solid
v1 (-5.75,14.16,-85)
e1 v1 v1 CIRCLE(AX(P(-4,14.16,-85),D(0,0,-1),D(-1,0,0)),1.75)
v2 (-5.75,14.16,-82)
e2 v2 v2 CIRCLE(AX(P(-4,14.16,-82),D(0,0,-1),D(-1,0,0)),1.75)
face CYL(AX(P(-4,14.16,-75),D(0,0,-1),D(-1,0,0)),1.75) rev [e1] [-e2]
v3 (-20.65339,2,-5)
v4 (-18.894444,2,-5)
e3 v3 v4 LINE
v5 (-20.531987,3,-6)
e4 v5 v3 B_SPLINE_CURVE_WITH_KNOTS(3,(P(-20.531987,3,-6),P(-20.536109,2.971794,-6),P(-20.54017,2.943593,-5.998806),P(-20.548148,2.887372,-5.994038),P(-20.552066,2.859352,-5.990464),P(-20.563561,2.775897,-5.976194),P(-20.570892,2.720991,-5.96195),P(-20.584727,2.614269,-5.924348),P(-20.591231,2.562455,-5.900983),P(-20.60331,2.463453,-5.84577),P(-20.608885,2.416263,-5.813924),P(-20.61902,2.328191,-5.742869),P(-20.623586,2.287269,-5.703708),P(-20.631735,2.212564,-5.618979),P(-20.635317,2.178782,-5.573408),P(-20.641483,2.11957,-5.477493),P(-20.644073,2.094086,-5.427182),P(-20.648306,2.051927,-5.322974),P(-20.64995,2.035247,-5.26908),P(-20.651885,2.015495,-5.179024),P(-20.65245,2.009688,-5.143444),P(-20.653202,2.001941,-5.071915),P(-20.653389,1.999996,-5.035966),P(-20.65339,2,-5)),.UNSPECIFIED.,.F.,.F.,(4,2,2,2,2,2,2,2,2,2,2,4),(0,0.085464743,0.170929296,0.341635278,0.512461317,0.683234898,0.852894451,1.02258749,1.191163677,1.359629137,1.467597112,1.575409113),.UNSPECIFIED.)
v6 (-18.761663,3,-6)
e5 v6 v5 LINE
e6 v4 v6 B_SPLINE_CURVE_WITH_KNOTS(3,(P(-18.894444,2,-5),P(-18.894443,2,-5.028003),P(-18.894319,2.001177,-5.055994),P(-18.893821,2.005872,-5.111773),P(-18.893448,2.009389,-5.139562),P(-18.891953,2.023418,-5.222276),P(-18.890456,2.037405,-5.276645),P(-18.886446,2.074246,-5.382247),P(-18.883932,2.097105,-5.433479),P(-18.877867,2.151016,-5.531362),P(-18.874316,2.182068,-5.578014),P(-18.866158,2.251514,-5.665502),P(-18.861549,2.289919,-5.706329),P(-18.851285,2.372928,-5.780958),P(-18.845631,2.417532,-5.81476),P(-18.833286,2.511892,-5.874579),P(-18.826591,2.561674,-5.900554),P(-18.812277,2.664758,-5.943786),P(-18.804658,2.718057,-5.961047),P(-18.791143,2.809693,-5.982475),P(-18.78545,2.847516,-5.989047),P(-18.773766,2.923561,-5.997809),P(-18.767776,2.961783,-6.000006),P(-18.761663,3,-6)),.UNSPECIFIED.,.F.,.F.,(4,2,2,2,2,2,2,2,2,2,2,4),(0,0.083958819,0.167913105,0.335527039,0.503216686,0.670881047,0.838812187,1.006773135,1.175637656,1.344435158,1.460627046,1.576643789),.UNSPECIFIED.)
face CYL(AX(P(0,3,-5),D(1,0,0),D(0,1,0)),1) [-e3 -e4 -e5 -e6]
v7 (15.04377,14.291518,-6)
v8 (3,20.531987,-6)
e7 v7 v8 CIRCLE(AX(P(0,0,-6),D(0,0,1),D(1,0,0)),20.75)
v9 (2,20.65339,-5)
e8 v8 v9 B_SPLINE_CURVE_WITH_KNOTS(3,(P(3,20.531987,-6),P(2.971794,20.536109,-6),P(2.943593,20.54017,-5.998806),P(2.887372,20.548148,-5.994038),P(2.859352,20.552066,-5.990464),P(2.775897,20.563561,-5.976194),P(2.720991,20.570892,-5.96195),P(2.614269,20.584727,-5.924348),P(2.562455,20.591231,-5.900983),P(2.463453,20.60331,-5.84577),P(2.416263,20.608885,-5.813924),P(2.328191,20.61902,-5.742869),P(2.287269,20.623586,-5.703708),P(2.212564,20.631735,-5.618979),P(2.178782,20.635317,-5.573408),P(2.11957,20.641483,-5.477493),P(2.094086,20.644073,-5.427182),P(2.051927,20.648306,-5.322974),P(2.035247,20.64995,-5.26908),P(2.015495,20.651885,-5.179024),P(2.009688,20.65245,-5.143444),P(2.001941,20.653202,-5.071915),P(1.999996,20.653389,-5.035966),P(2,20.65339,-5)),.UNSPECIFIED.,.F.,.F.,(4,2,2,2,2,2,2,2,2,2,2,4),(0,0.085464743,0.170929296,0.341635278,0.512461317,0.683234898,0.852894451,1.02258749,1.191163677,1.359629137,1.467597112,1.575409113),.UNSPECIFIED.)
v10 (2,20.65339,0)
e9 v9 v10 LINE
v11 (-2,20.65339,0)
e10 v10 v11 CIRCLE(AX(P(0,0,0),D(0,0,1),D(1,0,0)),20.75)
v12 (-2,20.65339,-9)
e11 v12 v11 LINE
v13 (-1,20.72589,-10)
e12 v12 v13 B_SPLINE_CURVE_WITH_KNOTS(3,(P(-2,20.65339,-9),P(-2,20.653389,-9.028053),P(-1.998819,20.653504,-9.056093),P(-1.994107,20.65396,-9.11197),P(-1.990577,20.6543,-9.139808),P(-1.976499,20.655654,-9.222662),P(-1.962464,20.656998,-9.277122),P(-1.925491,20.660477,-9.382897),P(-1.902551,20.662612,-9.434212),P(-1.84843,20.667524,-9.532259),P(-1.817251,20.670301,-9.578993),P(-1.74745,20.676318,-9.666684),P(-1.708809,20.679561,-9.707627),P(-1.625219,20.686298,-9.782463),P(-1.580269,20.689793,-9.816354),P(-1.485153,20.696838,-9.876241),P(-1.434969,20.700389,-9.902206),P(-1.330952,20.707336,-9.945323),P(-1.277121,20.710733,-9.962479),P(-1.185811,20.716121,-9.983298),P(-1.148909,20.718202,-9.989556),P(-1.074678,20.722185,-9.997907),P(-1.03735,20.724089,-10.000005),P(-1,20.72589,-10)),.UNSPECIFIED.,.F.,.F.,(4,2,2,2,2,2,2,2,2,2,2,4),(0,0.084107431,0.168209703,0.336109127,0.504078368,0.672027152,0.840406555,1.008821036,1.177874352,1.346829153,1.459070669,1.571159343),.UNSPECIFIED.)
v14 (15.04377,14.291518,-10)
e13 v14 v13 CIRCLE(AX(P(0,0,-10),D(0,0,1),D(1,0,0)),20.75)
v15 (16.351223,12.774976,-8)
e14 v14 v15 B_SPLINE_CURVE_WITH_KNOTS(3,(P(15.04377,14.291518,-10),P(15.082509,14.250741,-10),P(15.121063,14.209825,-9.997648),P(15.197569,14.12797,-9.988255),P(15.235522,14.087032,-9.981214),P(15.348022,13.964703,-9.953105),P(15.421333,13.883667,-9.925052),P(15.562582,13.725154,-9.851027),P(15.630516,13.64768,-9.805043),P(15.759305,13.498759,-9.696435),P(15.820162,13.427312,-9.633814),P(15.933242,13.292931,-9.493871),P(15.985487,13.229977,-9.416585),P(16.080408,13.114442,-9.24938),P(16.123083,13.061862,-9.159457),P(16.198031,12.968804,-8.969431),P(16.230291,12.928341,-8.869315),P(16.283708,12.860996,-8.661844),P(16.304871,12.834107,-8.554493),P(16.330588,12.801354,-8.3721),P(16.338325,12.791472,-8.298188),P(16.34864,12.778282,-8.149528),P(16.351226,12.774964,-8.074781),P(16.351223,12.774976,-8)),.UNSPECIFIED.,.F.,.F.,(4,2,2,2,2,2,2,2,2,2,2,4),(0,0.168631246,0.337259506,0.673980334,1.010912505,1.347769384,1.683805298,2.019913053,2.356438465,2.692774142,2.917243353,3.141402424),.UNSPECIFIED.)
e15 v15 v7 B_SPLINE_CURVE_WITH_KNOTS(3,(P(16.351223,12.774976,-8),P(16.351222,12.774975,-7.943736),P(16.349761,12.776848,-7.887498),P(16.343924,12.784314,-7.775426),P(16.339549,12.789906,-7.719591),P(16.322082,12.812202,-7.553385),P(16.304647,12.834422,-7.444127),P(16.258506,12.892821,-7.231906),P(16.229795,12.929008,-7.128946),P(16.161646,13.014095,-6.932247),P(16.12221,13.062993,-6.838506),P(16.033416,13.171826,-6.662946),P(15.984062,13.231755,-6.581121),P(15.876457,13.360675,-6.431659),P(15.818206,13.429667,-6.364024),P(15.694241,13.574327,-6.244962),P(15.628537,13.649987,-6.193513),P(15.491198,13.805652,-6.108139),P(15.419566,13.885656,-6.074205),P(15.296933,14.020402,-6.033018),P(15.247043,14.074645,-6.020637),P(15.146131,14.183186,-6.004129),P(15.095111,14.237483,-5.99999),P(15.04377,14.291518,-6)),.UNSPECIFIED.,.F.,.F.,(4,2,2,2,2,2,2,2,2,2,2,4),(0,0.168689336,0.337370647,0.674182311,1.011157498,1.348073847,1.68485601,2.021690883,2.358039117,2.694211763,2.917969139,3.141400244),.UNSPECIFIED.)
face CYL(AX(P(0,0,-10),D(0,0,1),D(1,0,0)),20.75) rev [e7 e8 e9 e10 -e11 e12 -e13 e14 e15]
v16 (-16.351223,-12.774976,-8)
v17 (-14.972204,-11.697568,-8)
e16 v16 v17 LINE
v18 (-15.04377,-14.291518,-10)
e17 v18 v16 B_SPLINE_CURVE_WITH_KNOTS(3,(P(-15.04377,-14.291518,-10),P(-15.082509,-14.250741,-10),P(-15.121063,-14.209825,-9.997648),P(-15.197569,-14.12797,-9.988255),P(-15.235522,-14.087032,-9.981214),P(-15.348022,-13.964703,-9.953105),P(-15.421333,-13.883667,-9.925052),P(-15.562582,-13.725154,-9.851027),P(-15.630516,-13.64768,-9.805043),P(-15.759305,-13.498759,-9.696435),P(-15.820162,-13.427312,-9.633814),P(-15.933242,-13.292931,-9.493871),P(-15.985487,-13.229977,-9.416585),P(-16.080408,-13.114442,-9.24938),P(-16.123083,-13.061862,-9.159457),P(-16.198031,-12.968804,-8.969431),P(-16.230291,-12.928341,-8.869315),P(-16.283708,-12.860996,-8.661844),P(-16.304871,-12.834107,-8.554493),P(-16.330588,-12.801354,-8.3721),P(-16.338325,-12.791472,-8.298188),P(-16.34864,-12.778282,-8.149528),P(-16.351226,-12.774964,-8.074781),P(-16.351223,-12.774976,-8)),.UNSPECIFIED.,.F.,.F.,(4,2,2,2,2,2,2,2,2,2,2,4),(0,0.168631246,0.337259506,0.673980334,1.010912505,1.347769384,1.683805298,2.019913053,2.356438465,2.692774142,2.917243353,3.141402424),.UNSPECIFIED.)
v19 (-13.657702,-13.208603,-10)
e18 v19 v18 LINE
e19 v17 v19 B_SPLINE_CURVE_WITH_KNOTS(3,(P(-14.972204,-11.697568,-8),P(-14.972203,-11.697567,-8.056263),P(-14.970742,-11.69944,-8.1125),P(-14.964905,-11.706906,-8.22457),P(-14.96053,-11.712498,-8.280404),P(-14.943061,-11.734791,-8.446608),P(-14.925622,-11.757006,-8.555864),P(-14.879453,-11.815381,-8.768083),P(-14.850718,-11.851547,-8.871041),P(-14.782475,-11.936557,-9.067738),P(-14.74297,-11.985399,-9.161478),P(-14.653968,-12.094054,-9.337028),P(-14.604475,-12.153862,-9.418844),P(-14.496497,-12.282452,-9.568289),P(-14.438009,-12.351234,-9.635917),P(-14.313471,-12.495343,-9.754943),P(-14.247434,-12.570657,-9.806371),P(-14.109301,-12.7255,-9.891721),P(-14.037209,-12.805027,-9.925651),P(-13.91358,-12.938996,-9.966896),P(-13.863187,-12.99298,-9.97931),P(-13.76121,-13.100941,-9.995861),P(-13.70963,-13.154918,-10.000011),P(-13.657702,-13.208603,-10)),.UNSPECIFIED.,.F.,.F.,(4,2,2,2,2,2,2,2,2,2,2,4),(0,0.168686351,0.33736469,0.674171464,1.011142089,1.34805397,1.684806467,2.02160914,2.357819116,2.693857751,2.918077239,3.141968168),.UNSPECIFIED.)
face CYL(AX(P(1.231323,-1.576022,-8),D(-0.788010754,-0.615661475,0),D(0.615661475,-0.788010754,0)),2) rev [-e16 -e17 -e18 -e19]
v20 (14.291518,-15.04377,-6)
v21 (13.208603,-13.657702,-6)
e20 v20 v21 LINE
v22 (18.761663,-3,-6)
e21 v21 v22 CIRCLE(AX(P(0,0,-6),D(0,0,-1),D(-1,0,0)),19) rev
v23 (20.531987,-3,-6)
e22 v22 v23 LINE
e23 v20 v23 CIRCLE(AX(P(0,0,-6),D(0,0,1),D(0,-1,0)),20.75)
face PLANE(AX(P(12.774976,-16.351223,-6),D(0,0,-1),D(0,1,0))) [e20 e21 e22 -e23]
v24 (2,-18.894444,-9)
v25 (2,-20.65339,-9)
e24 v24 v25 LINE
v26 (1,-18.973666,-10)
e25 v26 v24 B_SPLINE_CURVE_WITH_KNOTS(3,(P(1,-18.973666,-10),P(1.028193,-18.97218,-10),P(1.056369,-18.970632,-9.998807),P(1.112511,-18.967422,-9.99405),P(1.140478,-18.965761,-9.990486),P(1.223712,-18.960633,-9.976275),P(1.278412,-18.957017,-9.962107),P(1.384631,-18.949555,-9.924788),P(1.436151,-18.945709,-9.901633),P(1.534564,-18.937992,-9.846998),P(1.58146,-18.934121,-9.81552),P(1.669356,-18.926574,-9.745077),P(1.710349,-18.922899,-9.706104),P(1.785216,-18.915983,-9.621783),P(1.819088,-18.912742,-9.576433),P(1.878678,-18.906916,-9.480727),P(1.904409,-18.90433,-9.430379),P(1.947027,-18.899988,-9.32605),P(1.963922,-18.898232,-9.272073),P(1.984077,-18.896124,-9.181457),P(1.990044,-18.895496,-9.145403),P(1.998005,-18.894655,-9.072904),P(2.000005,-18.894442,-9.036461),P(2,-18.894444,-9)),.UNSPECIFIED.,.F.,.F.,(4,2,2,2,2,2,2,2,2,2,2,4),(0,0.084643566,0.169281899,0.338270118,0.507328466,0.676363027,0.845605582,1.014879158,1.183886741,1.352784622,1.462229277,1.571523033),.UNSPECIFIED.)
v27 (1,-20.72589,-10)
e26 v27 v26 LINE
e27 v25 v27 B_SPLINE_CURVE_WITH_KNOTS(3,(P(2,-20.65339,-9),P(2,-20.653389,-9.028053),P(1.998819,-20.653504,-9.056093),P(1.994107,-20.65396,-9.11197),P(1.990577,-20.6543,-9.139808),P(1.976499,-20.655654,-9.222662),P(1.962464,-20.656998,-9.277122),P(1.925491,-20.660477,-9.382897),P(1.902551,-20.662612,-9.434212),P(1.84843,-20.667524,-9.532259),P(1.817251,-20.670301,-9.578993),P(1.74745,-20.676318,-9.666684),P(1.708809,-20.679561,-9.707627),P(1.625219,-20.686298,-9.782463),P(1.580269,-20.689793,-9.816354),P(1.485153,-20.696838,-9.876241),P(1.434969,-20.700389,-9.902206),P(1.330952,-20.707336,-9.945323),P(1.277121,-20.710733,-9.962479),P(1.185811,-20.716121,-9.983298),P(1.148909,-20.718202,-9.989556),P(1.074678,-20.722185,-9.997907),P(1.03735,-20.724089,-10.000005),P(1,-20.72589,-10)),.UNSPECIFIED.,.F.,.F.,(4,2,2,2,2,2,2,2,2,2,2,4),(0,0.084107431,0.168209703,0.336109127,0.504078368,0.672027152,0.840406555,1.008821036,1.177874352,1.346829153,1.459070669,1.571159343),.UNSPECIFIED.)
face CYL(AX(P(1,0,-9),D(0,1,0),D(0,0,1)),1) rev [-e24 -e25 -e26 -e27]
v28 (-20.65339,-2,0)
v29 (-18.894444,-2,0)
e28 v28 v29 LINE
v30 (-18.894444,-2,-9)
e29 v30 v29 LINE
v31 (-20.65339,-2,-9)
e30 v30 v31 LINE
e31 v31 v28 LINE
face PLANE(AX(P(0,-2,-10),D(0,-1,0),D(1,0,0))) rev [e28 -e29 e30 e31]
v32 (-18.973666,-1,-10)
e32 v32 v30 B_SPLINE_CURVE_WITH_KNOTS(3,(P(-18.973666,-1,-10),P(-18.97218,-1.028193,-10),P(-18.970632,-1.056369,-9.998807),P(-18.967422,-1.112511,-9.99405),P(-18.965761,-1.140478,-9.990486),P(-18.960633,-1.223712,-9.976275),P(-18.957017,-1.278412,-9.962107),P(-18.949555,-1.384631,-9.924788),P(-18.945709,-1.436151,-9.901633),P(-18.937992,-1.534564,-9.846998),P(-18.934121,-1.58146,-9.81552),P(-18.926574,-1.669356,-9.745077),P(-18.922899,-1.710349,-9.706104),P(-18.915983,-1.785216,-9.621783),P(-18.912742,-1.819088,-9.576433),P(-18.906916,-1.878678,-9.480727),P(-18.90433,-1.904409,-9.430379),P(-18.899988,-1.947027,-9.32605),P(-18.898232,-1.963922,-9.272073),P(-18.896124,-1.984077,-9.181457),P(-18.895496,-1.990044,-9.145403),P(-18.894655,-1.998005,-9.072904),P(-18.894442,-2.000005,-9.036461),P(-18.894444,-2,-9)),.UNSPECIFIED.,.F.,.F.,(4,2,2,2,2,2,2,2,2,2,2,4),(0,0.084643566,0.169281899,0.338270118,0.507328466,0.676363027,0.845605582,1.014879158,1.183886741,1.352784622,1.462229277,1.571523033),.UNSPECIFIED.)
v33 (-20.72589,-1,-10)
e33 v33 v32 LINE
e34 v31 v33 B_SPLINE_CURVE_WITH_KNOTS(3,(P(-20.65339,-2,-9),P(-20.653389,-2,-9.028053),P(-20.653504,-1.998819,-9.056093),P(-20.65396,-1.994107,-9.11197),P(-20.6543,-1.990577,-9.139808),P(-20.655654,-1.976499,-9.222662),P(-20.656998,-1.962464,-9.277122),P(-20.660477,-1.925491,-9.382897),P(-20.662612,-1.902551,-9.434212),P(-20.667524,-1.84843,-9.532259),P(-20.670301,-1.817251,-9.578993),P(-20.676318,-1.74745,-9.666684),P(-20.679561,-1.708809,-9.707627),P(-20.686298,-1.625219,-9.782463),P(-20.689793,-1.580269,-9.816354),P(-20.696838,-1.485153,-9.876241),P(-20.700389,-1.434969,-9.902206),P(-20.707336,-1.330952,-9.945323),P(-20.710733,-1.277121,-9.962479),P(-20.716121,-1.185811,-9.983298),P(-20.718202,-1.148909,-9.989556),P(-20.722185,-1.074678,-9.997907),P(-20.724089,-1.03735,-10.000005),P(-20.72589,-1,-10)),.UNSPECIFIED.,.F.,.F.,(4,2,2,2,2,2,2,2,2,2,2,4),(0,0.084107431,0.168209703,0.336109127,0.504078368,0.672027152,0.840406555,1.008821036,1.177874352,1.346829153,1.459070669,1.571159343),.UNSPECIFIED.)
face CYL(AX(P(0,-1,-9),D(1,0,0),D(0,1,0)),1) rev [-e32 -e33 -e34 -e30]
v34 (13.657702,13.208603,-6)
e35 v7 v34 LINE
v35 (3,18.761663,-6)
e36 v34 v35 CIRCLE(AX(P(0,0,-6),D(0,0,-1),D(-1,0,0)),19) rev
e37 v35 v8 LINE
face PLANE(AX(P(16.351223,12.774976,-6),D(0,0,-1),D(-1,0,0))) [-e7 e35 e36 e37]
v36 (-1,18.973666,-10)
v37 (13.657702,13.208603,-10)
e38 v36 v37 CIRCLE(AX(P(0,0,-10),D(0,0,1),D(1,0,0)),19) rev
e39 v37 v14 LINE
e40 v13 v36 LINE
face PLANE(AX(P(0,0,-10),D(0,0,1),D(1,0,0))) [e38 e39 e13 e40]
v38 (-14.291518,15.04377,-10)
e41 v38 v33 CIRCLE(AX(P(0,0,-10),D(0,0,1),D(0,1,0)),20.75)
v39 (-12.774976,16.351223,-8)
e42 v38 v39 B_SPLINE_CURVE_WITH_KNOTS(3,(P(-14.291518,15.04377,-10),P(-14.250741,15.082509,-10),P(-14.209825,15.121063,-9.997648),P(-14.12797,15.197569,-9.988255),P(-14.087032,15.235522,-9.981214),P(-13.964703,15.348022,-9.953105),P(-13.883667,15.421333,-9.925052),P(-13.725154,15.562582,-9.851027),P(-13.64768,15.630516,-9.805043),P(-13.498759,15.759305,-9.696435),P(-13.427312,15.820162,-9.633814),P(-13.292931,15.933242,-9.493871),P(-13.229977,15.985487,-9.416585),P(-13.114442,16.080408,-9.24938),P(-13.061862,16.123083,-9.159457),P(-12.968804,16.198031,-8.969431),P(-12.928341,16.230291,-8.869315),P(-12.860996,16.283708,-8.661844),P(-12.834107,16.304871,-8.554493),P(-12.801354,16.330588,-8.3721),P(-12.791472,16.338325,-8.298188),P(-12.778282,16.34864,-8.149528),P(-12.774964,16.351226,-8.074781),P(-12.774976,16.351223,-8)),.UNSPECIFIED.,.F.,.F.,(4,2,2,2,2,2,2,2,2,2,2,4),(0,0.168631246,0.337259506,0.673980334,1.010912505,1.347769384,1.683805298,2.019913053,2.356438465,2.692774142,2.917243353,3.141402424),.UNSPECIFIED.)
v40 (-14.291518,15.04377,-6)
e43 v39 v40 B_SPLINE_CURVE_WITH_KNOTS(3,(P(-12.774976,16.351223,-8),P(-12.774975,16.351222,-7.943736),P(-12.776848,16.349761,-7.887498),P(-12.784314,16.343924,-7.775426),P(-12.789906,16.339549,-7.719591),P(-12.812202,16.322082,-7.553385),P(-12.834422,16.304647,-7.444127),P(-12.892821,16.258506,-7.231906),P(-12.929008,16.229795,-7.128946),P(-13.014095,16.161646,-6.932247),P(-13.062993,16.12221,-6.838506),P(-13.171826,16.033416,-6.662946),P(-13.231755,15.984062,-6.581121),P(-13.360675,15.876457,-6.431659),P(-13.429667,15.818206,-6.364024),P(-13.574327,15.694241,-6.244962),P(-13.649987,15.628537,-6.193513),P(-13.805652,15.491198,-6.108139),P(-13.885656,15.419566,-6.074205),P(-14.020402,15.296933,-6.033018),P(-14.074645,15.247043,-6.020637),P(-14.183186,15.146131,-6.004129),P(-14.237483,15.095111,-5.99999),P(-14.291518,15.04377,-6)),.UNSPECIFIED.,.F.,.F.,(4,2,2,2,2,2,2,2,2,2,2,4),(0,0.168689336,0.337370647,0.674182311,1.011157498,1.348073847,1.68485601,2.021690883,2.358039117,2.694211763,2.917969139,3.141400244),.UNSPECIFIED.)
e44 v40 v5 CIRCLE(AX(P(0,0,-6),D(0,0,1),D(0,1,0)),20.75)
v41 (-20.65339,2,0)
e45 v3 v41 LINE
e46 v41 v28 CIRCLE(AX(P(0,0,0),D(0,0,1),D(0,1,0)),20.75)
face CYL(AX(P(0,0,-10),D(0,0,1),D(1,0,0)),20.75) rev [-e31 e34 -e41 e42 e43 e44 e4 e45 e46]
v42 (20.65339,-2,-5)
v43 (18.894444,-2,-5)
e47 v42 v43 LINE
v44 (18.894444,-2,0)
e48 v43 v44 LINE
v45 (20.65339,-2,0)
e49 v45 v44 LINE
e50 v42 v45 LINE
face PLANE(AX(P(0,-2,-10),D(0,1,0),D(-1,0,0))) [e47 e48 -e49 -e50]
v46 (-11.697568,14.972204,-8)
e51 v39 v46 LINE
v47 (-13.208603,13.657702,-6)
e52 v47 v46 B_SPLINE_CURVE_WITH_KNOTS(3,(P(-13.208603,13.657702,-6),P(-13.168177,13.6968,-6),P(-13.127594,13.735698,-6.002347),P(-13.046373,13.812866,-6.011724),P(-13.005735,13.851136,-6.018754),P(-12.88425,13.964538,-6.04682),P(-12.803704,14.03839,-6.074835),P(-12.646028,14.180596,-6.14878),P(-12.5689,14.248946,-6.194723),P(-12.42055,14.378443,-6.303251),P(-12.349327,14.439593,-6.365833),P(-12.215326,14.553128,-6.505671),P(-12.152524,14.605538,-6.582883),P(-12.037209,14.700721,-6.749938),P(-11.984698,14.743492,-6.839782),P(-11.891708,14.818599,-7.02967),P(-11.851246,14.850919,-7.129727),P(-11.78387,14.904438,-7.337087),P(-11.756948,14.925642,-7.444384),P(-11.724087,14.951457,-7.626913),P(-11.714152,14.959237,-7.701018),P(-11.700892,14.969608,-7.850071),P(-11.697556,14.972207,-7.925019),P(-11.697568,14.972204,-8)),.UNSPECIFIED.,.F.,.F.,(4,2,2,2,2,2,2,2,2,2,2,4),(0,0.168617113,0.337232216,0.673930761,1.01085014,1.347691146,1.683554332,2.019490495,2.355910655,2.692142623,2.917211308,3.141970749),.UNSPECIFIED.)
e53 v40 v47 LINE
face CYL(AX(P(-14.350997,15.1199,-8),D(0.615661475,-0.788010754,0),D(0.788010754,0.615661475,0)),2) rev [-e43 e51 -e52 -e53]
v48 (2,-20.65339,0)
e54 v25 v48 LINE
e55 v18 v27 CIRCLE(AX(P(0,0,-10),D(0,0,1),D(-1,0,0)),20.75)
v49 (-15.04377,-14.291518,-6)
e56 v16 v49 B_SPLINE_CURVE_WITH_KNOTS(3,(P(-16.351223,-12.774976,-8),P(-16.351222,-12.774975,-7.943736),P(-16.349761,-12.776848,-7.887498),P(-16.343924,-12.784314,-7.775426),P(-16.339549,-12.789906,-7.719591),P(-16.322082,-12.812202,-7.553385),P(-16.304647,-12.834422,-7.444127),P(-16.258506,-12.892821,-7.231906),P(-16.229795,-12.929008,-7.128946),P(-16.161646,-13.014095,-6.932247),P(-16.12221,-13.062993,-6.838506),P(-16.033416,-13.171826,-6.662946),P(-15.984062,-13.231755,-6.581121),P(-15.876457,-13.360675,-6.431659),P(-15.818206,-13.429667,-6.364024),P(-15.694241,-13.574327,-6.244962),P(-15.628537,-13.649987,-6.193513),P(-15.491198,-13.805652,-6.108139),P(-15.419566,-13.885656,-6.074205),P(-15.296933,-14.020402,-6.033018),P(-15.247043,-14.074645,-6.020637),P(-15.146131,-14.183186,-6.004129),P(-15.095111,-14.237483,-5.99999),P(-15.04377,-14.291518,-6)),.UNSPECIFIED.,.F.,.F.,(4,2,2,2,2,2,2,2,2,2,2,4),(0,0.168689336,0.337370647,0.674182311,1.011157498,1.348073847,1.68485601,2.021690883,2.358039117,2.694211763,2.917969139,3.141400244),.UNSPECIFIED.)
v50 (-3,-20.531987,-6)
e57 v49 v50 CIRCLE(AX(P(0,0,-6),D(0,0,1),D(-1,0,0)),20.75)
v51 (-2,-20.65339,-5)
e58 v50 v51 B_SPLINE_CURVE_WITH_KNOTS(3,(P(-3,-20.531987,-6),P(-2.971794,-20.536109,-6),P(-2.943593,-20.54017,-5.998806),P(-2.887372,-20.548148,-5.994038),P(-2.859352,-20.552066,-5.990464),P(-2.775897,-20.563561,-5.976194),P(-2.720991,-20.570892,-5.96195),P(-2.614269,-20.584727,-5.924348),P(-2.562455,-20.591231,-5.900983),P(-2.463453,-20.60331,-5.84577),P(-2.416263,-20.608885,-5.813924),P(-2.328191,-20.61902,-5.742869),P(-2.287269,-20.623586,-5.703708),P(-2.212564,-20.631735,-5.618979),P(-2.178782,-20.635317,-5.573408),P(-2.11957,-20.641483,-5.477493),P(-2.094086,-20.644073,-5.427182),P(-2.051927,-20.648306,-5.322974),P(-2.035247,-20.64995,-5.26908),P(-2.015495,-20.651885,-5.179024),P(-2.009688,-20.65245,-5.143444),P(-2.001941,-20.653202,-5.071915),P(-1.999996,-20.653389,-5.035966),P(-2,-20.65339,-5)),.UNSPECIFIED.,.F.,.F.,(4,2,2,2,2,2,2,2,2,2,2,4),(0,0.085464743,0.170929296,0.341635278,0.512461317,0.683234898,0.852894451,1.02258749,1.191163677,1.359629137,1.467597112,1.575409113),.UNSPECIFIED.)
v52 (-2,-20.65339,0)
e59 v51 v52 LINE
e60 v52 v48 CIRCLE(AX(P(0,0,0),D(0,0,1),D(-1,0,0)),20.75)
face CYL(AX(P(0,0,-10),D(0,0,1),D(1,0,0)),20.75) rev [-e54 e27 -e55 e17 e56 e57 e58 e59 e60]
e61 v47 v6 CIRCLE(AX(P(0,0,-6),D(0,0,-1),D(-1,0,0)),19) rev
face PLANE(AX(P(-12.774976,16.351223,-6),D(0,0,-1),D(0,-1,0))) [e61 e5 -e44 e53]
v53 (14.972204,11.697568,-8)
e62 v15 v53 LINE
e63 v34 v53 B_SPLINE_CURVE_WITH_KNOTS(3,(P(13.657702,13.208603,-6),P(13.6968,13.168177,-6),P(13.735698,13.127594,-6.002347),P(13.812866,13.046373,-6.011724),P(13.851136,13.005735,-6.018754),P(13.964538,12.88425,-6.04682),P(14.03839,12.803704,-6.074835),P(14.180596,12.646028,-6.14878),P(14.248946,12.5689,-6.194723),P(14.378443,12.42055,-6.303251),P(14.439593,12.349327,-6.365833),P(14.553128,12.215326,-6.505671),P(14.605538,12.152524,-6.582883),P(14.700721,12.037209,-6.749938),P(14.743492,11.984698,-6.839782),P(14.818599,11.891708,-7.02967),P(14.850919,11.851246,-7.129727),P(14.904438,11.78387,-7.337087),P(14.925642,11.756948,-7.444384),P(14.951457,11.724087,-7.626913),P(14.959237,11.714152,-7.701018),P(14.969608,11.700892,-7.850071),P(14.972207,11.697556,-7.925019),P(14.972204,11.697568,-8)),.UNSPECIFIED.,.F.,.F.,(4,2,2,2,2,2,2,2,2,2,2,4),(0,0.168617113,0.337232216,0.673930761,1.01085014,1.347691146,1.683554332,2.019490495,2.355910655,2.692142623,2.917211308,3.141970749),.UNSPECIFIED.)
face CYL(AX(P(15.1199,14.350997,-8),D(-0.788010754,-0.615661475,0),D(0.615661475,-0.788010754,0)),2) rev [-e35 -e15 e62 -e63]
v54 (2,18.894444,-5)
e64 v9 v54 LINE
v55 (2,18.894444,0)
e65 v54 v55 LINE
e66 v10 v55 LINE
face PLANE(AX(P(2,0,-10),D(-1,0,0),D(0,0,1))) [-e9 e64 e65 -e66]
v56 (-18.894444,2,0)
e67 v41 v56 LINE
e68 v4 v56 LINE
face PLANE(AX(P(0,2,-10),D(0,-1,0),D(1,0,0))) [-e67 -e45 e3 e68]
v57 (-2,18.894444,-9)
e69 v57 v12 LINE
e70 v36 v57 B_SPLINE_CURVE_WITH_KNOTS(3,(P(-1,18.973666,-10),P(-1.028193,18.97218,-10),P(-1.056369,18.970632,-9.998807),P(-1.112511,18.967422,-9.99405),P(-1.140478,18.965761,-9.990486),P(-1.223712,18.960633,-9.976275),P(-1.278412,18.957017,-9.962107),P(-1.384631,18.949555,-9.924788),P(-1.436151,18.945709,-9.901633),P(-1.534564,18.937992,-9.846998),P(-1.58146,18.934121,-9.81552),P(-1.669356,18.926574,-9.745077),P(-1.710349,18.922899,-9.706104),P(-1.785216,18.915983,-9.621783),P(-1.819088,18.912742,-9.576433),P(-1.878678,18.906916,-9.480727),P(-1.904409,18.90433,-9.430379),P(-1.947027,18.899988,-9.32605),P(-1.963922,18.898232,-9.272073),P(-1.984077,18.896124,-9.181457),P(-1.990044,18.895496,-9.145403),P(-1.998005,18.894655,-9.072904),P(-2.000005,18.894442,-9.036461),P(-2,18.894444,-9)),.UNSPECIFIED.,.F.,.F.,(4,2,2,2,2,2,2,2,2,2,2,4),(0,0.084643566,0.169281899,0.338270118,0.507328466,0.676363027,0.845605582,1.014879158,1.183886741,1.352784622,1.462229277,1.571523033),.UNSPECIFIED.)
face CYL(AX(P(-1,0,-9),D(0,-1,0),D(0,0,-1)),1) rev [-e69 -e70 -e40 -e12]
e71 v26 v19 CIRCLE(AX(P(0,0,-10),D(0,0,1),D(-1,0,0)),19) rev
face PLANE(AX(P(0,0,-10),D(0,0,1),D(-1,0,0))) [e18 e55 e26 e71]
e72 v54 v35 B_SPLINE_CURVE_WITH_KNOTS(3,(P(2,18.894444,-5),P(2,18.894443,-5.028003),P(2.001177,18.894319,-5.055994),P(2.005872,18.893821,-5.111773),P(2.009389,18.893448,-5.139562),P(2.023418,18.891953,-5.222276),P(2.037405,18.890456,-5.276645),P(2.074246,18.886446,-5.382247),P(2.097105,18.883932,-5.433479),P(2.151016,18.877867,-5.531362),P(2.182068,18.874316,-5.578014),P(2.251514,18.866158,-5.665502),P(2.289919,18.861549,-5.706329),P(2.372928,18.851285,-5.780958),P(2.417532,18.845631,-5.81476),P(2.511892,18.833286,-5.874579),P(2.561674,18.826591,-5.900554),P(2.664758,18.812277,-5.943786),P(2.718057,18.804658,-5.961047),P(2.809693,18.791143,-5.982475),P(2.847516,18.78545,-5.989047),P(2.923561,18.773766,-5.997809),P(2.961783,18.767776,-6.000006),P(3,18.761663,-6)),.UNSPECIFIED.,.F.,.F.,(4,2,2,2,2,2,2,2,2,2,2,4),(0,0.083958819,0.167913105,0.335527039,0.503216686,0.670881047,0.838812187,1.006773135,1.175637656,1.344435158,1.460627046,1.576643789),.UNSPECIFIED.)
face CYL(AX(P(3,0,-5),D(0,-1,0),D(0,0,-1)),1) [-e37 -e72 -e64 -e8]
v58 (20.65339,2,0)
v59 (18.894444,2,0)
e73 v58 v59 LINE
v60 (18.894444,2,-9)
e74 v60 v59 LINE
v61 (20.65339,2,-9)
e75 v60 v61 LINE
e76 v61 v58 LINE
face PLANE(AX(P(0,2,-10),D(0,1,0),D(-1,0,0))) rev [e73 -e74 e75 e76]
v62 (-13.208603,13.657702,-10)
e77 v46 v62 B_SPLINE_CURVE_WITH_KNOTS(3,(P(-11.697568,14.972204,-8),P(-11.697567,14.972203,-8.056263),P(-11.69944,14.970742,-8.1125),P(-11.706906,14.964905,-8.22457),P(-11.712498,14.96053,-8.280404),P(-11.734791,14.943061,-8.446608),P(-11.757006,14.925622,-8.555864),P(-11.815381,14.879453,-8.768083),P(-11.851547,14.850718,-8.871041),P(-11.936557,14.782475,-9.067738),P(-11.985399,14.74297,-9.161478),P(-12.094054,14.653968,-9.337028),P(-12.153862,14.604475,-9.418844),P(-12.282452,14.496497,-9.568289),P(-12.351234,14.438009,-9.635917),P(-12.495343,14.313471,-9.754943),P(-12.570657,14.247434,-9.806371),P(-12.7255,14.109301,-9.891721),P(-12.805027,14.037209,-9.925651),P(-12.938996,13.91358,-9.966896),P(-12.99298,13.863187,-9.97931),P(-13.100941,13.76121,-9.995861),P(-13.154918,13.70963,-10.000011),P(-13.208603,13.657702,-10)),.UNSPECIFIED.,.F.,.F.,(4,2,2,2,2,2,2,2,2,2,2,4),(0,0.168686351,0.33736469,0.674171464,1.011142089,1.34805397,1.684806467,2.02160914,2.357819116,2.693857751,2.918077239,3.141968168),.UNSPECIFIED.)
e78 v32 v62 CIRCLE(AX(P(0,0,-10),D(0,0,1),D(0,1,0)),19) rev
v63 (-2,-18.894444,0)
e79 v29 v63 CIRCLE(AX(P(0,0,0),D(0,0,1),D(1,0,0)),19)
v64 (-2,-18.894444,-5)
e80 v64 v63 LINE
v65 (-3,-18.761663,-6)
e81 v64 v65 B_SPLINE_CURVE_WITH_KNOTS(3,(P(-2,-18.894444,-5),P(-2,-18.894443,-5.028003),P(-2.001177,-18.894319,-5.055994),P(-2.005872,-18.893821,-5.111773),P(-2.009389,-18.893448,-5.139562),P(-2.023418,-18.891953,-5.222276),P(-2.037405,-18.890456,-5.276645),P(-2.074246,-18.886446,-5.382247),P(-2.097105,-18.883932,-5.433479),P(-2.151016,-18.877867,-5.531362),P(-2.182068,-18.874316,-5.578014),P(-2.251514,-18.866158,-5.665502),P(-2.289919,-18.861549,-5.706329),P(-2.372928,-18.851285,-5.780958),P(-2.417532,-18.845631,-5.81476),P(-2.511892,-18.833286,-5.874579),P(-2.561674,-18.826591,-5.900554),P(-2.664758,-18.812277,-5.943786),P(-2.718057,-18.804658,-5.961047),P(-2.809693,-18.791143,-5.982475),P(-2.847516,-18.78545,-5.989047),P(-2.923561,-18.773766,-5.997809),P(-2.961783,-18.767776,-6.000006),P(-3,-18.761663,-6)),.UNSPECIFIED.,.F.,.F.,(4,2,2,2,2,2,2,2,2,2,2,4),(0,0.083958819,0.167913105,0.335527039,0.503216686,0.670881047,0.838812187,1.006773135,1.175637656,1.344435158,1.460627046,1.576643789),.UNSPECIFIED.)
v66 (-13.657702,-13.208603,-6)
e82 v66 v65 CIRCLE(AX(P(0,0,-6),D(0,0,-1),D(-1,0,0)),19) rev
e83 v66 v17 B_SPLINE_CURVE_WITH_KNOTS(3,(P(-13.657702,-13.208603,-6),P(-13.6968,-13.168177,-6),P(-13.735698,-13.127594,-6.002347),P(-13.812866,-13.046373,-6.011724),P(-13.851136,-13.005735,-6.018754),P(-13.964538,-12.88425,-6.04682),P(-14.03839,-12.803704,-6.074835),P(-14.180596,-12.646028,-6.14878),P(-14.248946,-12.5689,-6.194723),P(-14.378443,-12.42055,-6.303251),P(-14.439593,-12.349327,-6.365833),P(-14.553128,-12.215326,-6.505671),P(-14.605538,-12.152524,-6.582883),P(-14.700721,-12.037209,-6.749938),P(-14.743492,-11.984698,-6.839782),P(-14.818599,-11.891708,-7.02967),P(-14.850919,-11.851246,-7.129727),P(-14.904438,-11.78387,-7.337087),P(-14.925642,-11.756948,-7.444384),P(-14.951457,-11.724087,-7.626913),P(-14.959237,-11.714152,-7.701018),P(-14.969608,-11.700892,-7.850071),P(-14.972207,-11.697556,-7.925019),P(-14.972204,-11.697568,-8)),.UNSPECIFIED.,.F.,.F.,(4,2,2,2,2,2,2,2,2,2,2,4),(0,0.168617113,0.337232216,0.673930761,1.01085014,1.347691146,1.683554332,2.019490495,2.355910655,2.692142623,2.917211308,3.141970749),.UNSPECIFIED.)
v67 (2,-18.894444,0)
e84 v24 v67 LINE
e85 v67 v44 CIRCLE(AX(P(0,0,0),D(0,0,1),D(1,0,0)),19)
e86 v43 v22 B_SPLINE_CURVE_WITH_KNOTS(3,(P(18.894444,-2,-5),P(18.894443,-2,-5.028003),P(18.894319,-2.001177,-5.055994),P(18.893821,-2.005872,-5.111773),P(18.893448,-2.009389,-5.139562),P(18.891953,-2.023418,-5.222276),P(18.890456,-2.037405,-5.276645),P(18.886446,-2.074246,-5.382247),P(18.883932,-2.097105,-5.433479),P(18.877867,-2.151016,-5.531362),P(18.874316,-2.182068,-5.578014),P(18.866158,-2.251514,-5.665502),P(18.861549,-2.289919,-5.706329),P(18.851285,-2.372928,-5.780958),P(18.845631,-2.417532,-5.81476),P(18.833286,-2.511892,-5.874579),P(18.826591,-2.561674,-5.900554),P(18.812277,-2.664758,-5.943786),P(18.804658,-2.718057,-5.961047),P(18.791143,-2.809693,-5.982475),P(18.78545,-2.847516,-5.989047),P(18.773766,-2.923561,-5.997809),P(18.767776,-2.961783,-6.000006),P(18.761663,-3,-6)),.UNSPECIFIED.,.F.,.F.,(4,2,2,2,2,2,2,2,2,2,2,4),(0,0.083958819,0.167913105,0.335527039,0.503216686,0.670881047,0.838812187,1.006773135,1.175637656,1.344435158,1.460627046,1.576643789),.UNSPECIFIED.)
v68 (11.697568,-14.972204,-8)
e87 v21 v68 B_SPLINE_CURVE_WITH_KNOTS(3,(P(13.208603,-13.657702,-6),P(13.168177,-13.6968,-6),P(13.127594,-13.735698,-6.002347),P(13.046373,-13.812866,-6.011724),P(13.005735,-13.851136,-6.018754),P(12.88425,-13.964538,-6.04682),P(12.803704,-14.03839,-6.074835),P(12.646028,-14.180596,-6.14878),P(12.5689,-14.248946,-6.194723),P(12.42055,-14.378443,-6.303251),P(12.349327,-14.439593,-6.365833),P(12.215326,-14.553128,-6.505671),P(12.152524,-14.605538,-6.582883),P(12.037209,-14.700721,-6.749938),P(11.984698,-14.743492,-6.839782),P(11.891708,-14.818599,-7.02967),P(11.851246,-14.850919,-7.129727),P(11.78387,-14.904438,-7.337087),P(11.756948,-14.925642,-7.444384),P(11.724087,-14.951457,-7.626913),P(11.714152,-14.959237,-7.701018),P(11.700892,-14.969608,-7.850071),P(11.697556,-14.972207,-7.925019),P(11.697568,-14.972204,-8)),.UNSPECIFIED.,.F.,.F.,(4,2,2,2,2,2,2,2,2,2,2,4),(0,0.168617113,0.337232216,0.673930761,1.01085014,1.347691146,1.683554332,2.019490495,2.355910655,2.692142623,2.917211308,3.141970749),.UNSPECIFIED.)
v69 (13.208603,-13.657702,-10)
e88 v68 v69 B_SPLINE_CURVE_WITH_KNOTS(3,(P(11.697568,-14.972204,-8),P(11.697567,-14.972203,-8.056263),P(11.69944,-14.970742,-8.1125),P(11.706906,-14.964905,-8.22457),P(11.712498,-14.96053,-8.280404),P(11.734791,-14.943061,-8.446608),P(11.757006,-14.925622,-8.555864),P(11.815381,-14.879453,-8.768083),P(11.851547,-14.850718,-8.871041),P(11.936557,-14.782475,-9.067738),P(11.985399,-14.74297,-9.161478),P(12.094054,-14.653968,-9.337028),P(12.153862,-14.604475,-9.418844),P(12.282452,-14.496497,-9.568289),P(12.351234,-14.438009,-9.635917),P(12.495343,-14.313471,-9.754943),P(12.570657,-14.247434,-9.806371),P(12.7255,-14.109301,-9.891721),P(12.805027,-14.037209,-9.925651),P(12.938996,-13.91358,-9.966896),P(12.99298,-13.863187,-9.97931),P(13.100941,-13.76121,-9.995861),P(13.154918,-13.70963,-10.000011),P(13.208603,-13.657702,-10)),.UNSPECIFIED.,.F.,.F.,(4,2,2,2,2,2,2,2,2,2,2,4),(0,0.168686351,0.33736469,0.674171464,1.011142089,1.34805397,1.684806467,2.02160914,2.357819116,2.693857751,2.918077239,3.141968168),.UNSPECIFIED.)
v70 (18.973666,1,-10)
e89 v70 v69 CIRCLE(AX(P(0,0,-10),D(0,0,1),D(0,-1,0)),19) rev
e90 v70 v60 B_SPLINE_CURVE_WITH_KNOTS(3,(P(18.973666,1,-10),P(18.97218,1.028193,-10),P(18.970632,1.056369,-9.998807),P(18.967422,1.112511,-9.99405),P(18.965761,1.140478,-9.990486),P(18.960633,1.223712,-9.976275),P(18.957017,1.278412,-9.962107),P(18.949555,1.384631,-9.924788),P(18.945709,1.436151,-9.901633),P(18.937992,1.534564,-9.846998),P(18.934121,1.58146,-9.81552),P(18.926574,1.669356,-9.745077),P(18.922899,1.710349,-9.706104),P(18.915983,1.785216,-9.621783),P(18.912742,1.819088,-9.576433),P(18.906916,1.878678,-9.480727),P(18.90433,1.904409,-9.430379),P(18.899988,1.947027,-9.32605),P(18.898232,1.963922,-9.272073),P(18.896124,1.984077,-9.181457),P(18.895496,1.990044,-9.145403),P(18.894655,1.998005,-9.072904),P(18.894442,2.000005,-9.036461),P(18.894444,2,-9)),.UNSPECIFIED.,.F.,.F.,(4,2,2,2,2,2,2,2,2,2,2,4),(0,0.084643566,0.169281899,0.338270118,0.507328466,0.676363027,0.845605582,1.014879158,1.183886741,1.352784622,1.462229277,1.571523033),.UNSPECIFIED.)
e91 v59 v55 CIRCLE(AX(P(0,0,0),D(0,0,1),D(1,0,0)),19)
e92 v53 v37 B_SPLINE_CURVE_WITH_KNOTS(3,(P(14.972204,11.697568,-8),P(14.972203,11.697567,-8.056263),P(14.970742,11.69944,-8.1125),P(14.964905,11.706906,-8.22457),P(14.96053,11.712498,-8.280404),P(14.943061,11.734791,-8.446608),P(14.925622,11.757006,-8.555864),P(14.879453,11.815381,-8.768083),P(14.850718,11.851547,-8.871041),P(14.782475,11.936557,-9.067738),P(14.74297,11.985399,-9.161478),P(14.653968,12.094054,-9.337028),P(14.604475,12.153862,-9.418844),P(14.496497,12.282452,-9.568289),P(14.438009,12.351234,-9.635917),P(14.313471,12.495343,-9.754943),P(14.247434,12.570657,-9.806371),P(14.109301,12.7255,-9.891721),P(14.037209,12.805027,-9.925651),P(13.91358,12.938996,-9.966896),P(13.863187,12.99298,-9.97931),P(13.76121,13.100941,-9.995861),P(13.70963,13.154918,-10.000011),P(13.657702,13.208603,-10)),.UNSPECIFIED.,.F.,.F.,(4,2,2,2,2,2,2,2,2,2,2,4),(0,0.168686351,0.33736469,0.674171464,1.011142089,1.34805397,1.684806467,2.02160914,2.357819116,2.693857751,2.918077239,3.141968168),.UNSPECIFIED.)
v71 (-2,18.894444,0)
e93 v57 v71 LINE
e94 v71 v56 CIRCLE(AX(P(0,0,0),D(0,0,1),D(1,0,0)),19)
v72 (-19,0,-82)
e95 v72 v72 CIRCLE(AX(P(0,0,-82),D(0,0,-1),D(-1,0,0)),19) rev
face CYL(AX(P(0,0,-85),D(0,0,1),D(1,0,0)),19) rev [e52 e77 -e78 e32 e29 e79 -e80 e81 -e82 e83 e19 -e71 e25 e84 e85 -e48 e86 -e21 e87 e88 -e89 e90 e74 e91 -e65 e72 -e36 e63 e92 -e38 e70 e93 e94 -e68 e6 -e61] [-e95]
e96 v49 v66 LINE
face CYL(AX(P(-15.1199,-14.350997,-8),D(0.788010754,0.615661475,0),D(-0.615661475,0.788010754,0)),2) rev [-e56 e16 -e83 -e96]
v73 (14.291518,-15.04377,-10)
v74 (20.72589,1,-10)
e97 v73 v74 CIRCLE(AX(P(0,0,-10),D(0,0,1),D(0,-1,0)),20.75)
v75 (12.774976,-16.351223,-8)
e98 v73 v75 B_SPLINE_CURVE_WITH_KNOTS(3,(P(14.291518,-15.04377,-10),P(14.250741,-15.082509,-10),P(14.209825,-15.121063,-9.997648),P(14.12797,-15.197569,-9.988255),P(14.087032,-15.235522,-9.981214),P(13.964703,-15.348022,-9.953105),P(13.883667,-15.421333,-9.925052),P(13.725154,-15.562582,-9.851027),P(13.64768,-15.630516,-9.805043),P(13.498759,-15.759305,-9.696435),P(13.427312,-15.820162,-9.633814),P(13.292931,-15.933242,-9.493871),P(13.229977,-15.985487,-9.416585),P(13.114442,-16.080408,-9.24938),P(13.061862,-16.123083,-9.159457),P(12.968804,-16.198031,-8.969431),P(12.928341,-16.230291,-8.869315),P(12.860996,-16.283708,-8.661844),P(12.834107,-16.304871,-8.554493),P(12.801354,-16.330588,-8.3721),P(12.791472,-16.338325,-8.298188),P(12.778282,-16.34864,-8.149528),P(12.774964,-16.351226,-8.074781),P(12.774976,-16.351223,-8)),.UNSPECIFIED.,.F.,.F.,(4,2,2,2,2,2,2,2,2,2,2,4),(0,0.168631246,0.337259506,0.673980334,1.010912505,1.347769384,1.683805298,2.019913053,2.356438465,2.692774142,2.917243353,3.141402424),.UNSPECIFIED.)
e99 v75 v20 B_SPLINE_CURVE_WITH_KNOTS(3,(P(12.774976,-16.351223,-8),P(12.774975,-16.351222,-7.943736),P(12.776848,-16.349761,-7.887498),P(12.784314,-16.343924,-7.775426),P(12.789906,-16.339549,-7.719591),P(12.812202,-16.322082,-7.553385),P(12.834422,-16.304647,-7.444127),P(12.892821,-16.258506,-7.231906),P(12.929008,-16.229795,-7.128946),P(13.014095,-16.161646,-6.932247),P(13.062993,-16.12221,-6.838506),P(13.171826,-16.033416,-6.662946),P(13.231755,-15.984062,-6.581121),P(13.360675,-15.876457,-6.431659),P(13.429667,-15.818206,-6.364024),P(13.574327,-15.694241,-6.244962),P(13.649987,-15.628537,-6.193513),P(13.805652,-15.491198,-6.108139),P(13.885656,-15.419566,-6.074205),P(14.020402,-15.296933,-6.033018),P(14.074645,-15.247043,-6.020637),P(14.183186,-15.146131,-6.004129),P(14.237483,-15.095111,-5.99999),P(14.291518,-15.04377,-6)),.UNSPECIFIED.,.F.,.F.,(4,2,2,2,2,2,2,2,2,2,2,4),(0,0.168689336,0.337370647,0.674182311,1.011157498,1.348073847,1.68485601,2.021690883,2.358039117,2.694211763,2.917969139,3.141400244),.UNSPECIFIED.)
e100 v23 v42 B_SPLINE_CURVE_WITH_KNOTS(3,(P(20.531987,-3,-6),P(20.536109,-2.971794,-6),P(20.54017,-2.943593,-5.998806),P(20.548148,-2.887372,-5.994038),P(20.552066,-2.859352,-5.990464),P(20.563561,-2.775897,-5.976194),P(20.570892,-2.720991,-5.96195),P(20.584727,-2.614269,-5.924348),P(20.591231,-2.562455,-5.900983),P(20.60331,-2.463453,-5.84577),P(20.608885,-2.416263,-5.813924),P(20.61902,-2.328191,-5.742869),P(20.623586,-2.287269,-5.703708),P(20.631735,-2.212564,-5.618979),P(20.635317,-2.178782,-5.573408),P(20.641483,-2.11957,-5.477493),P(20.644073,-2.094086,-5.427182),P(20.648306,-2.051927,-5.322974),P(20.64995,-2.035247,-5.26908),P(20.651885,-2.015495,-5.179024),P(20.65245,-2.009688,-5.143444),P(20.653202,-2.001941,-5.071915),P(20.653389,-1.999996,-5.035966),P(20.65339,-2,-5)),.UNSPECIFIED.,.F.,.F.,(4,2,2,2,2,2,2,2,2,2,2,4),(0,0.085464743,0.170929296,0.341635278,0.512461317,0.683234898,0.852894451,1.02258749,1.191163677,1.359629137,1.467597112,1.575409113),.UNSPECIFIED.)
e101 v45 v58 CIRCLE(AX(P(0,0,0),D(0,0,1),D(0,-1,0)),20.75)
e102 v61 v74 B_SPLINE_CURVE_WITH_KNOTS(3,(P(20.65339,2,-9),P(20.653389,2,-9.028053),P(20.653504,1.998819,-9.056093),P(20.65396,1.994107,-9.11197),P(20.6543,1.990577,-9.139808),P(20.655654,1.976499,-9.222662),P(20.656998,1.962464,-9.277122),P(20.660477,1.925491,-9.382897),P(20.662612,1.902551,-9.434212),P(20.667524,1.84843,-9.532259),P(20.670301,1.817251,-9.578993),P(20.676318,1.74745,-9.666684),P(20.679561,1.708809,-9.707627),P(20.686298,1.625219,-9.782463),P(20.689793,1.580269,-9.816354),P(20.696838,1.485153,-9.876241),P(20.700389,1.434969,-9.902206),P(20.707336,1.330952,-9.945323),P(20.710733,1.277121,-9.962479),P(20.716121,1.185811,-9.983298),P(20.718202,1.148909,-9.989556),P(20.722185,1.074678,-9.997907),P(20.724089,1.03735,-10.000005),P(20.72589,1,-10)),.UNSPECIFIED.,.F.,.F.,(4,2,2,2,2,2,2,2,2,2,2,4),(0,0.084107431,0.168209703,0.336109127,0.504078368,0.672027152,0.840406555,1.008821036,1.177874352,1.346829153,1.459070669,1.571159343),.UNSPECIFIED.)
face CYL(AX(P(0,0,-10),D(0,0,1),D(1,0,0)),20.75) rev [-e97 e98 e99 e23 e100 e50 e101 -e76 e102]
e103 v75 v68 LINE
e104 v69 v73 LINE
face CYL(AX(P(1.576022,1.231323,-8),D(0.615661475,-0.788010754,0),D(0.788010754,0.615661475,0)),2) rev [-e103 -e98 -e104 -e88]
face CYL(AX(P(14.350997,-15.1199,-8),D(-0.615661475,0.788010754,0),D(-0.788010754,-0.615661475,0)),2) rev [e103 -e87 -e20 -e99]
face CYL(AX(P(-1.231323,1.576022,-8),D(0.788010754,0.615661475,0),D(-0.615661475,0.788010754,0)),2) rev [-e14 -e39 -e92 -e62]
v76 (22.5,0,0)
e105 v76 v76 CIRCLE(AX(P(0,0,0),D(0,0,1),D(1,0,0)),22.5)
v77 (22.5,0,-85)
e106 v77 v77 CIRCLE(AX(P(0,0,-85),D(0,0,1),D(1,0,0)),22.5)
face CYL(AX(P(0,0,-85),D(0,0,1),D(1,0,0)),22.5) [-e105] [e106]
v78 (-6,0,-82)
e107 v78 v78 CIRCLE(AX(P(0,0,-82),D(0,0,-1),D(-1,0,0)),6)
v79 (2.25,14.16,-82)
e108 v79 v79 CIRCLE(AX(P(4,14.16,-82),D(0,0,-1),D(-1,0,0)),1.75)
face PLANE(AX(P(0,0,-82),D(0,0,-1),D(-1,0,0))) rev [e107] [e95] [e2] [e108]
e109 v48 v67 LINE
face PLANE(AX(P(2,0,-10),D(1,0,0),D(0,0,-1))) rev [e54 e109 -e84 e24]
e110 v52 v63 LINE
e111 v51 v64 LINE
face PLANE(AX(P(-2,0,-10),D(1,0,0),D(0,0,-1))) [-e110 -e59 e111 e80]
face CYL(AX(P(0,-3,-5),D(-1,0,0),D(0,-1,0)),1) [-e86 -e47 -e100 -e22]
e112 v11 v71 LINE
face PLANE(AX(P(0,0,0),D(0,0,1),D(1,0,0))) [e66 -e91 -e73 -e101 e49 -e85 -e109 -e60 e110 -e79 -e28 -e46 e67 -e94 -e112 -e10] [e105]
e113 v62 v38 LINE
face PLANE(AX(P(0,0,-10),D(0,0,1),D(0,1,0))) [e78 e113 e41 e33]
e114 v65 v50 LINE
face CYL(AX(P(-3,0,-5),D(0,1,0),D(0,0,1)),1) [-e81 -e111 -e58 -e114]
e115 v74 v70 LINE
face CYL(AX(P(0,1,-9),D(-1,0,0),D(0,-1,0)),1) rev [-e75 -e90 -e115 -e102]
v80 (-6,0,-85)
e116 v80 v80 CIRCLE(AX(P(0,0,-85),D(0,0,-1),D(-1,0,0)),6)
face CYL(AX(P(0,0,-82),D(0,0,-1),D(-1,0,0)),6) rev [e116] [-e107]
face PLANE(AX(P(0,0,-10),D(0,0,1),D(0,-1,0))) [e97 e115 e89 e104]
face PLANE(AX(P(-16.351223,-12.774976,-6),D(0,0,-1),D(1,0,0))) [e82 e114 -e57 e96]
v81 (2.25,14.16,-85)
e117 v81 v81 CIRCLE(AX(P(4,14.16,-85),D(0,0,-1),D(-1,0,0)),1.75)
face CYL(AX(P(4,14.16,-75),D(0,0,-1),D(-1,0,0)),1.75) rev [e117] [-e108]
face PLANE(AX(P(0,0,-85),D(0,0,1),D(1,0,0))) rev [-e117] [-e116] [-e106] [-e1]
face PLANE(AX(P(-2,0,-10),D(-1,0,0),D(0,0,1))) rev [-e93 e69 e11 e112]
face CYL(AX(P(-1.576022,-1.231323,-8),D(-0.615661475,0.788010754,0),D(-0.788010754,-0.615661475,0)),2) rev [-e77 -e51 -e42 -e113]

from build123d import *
from OCP.BRepFilletAPI import BRepFilletAPI_MakeFillet

# Parameters (mm, degrees)
SKETCH1_R                  = 22.5
SKETCH1_R_2                = 19
BOSS_EXTRUDE2_DEPTH        = 85
BOSS_EXTRUDE5_START        = -3
SKETCH3_R                  = 19
SKETCH3_R_2                = 6
BOSS_EXTRUDE5_DEPTH        = 3
CUT_EXTRUDE1_DEPTH         = 10
CUT_REVOLVE2_ANGLE         = 52.00000000000012
FILLET2_R                  = 2
FILLET2_R_2                = 1
CIRPATTERN1_COUNT          = 4
FILLET2_OF_CIRPATTERN1_R   = 2
FILLET2_OF_CIRPATTERN1_R_2 = 1
SKETCH17_R                 = 1.7499999999999998
CUT_EXTRUDE2_DEPTH         = 10


with BuildPart() as part:
    # Sketch1 → Boss-Extrude2 (new body)
    with BuildSketch(Plane.XY):
        Circle(SKETCH1_R)
        Circle(SKETCH1_R_2, mode=Mode.SUBTRACT)
    extrude(amount=-BOSS_EXTRUDE2_DEPTH)

    # Sketch3 → Boss-Extrude5 (add)
    with BuildSketch(Plane(origin=(0, 0, -85), x_dir=(-1, 0, 0), z_dir=(0, 0, -1)).offset(BOSS_EXTRUDE5_START)):
        with Locations(Location((0, 0, 0), (0, 0, 180))):
            Circle(SKETCH3_R)
        Circle(SKETCH3_R_2, mode=Mode.SUBTRACT)
    extrude(amount=BOSS_EXTRUDE5_DEPTH)

    # Sketch4 → Cut-Extrude1 (cut)
    with BuildSketch(Plane.XY):
        with BuildLine():
            ThreePointArc((1.999999999999999, 20.653389552322885), (1.27e-15, 20.75), (-2.000000000000001, 20.65338955232288))
            Line((-2, 20.65338955232288), (-2, 18.894443627691185))
            ThreePointArc((-2.000000000000001, 18.894443627691185), (1.16e-15, 19), (1.999999999999999, 18.894443627691185))
            Line((2, 18.894443627691185), (2, 20.65338955232288))
        make_face()
    cut_extrude1 = extrude(amount=-CUT_EXTRUDE1_DEPTH, mode=Mode.SUBTRACT)

    # Sketch8 → Cut-Revolve2 (revolve, cut)
    with BuildSketch(Plane(origin=(0, 0, 0), x_dir=(0, 0, -1), z_dir=(1, 0, 0))):
        Polygon((6.000000000000001, 20.75), (10, 20.75), (10, 18.9), (6.000000000000002, 18.9), align=None)
    cut_revolve2 = revolve(axis=Axis((0, 0, 0), (0, 0, -1)), revolution_arc=CUT_REVOLVE2_ANGLE, mode=Mode.SUBTRACT)

    # Fillet2
    fillet2_edges_1 = [part.edges().sort_by_distance(p)[0] for p in [
        (15.661713727933623, 12.236271822097425, -6.000000000000001),
        (15.661713727933623, 12.236271822097425, -10),
    ]]
    fillet2_edges_2 = [part.edges().sort_by_distance(p)[0] for p in [
        (-2, 19.773916590007033, -10),
        (2, 19.773916590007033, -6.000000000000002),
    ]]
    fillet2 = BRepFilletAPI_MakeFillet(part.part.solid().wrapped)
    for e in fillet2_edges_1:
        fillet2.Add(FILLET2_R - 0.0001, e.wrapped)
    for e in fillet2_edges_2:
        fillet2.Add(FILLET2_R_2 - 0.0001, e.wrapped)
    add(Compound.cast(fillet2.Shape()), mode=Mode.REPLACE)  # a hair under: the kernel refuses the full size

    # CirPattern1: Cut-Extrude1, Cut-Revolve2 ×4 about axis
    cirpattern1_axis = Axis((0, 0, 0), (0, 0, 1))
    add([cut_extrude1.rotate(cirpattern1_axis, i * 360 / CIRPATTERN1_COUNT) for i in range(1, CIRPATTERN1_COUNT)], mode=Mode.SUBTRACT)
    add([cut_revolve2.rotate(cirpattern1_axis, i * 360 / CIRPATTERN1_COUNT) for i in range(1, CIRPATTERN1_COUNT)], mode=Mode.SUBTRACT)

    # Fillet2 of CirPattern1
    fillet2_of_cirpattern1_edges_1 = [part.edges().sort_by_distance(p)[0] for p in [
        (-12.236271822097423, 15.661713727933625, -6.000000000000001),
        (-12.236271822097423, 15.661713727933627, -10),
        (-15.661713727933625, -12.236271822097423, -6.000000000000001),
        (-15.661713727933627, -12.236271822097423, -10),
        (12.236271822097422, -15.661713727933629, -6.000000000000001),
        (12.236271822097422, -15.661713727933627, -10),
    ]]
    fillet2_of_cirpattern1_edges_2 = [part.edges().sort_by_distance(p)[0] for p in [
        (-19.773916590007033, -1.9999999999999978, -10),
        (-19.773916590007033, 2.000000000000002, -6.000000000000002),
        (1.9999999999999976, -19.773916590007033, -10),
        (-2.000000000000002, -19.773916590007033, -6.000000000000002),
        (19.773916590007033, 1.9999999999999956, -10),
        (19.773916590007033, -2.000000000000004, -6.000000000000002),
    ]]
    fillet2_of_cirpattern1 = BRepFilletAPI_MakeFillet(part.part.solid().wrapped)
    for e in fillet2_of_cirpattern1_edges_1:
        fillet2_of_cirpattern1.Add(FILLET2_OF_CIRPATTERN1_R - 0.0001, e.wrapped)
    for e in fillet2_of_cirpattern1_edges_2:
        fillet2_of_cirpattern1.Add(FILLET2_OF_CIRPATTERN1_R_2 - 0.0001, e.wrapped)
    add(Compound.cast(fillet2_of_cirpattern1.Shape()), mode=Mode.REPLACE)  # a hair under: the kernel refuses the full size

    # Sketch17 → Cut-Extrude2 (cut)
    with BuildSketch(Plane(origin=(0, 0, -85), x_dir=(-1, 0, 0), z_dir=(0, 0, -1))):
        with Locations((-4, 14.16)):
            Circle(SKETCH17_R)
        with Locations((4, 14.16)):
            Circle(SKETCH17_R)
    extrude(amount=-CUT_EXTRUDE2_DEPTH, mode=Mode.SUBTRACT)


solid = part.part
